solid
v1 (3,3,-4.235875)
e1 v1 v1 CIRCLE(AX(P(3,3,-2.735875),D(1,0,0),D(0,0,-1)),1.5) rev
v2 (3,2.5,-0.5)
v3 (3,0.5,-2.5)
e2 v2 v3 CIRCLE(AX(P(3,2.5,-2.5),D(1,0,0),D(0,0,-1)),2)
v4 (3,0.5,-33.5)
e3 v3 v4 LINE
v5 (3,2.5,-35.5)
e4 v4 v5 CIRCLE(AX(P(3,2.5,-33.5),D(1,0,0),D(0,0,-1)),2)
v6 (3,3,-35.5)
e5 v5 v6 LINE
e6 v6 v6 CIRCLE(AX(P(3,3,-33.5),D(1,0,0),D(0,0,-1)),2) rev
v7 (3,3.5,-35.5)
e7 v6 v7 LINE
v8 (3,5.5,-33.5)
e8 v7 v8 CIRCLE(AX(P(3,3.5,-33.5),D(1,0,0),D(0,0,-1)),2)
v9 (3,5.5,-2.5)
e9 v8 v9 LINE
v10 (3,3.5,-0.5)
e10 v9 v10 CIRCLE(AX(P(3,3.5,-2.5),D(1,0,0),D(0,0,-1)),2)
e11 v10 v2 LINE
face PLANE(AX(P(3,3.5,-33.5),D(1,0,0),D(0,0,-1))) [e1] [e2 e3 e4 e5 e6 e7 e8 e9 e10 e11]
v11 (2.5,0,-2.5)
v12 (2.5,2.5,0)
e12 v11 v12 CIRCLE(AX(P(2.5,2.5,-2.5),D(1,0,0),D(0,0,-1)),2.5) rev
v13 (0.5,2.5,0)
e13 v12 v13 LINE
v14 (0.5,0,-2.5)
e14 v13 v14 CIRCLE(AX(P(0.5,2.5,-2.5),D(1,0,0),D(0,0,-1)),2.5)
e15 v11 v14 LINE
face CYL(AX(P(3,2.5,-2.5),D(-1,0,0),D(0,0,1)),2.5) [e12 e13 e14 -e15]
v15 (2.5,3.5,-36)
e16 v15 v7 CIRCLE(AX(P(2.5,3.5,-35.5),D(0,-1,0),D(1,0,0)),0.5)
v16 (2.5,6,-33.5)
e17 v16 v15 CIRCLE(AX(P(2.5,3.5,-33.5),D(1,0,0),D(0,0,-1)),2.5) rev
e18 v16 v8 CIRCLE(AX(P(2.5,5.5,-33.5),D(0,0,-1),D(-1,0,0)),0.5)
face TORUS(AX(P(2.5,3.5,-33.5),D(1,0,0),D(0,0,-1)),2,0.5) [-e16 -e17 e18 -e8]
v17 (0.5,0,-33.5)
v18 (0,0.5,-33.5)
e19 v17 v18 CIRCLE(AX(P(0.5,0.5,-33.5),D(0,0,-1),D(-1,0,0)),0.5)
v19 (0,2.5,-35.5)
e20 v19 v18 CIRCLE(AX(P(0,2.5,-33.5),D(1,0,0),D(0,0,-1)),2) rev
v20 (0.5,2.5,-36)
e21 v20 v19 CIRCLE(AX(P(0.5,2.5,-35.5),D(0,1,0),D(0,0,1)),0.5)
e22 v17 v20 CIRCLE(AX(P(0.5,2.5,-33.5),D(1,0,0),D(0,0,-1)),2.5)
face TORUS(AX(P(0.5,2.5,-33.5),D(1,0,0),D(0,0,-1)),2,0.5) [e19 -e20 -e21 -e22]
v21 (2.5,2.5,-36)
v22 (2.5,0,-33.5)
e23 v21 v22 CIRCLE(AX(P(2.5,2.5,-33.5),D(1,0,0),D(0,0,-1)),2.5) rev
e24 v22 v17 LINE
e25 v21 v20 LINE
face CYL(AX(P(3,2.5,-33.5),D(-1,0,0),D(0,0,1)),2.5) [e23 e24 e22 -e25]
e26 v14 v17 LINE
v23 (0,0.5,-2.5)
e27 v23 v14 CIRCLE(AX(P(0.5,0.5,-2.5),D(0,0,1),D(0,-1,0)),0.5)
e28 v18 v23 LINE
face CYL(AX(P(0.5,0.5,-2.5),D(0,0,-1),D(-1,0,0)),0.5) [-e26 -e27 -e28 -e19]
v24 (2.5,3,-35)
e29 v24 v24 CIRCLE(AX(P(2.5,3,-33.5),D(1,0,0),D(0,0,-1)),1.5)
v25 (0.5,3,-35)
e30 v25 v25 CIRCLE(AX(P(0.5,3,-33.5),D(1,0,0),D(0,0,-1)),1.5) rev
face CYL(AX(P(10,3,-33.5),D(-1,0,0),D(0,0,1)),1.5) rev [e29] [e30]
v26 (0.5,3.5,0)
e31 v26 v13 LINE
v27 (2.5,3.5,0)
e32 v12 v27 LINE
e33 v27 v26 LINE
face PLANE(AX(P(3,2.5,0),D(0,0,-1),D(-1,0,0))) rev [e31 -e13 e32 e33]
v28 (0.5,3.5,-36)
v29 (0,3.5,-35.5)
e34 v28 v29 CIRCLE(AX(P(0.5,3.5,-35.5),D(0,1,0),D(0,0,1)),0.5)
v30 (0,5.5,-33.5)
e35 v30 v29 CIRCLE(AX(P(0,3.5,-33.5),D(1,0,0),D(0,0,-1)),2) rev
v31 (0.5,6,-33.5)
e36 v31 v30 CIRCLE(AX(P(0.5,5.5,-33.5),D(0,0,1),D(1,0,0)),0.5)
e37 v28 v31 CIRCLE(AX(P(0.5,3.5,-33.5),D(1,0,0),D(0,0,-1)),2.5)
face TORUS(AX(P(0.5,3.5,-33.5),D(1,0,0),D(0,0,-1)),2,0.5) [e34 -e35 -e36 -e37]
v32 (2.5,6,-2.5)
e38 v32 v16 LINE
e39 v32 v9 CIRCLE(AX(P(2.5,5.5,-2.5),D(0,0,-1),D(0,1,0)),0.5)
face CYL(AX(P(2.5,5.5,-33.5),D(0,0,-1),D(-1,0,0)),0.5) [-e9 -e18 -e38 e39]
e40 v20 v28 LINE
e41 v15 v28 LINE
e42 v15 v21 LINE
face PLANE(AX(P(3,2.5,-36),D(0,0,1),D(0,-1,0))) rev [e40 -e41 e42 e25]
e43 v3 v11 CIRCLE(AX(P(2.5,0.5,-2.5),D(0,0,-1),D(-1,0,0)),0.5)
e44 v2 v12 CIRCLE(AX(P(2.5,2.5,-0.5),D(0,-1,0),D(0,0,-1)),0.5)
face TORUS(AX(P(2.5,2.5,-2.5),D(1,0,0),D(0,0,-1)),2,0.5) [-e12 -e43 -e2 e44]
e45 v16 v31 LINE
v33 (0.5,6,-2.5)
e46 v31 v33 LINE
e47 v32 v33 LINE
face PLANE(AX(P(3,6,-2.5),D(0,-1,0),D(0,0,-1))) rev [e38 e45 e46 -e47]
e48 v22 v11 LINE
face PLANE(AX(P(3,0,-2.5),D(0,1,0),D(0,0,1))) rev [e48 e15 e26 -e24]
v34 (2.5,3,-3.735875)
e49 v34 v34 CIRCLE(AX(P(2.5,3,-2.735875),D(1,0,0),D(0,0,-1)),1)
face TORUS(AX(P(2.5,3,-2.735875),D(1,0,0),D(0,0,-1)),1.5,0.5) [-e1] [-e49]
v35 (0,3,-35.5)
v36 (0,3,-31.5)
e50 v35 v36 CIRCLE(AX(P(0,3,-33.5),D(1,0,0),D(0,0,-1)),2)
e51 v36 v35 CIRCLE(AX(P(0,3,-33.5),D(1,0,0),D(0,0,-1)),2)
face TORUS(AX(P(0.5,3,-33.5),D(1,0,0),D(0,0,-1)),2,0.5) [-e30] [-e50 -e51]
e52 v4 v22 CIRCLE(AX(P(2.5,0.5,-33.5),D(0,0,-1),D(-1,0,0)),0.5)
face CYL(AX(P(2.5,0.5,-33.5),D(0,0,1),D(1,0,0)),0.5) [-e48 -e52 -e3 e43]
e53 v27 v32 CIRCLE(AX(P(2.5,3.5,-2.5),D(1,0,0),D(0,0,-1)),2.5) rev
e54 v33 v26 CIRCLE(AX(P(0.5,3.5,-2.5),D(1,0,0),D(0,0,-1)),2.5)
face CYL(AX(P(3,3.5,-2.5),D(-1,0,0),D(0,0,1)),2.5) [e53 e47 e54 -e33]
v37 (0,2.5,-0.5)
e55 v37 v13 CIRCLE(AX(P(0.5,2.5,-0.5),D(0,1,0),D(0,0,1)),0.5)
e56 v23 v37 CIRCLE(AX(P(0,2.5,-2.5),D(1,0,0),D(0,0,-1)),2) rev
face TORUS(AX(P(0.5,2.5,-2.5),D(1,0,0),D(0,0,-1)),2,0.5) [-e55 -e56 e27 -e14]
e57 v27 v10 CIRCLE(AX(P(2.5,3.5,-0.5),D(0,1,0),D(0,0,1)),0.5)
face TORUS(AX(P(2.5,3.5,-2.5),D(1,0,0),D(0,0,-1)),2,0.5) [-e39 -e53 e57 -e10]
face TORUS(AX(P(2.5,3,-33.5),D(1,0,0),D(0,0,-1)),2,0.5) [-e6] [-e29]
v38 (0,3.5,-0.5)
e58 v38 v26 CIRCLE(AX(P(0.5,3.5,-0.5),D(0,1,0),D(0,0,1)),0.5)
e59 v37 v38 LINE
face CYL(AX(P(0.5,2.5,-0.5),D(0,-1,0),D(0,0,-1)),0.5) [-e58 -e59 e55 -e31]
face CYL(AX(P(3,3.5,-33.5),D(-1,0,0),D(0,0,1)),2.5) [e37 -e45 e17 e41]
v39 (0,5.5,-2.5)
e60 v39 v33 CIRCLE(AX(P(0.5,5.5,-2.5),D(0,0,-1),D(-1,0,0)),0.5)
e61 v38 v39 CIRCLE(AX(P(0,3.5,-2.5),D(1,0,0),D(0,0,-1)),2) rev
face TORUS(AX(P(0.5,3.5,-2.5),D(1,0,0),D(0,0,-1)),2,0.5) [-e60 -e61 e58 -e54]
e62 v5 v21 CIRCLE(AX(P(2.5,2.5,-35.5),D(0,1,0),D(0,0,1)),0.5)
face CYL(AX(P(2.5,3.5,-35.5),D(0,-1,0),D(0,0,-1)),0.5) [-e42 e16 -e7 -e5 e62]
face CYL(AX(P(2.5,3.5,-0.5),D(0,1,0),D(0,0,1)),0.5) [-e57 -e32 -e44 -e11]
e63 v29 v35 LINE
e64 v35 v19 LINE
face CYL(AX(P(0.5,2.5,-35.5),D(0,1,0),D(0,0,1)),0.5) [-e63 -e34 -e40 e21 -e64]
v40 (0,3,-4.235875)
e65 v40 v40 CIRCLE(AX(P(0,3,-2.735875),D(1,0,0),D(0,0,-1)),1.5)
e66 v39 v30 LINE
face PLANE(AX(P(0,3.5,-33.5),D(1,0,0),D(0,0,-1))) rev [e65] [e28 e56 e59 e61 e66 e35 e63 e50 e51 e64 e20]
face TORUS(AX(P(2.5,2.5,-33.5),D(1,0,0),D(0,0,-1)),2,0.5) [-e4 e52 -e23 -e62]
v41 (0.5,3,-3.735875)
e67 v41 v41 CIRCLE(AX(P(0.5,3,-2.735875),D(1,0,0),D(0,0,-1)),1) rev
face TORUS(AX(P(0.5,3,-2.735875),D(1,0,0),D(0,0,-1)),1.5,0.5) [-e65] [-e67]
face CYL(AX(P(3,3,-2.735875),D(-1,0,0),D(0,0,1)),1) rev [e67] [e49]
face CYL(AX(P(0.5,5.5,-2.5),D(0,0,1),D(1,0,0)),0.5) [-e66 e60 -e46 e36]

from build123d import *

# Parameters (mm, degrees)
SKETCH1_R           = 1
BOSS_EXTRUDE1_DEPTH = 3
SKETCH2_R           = 1.5
CUT_EXTRUDE1_DEPTH  = 10
FILLET1_R           = 0.5


with BuildPart() as part:
    # Sketch1 → Boss-Extrude1 (new body)
    with BuildSketch(Plane(origin=(0, 0, 0), x_dir=(0, 0, -1), z_dir=(1, 0, 0))):
        with BuildLine():
            Line((2.5, 0), (33.5, 0))
            ThreePointArc((33.5, 0), (35.267766953, 0.732233047), (36, 2.5))
            Line((36, 2.5), (36, 3.5))
            ThreePointArc((36, 3.5), (35.267766953, 5.267766953), (33.5, 6))
            Line((33.5, 6), (2.5, 6))
            ThreePointArc((2.5, 6), (0.732233047, 5.267766953), (0, 3.5))
            Line((0, 3.5), (0, 2.5))
            ThreePointArc((0, 2.5), (0.732233047, 0.732233047), (2.5, 0))
        make_face()
        with Locations((2.73587532, 3)):
            Circle(SKETCH1_R, mode=Mode.SUBTRACT)
    extrude(amount=BOSS_EXTRUDE1_DEPTH)

    # Sketch2 → Cut-Extrude1 (cut)
    with BuildSketch(Plane.ZY):
        with Locations((-33.5, 3)):
            Circle(SKETCH2_R)
    extrude(amount=-CUT_EXTRUDE1_DEPTH, mode=Mode.SUBTRACT)

    # Fillet1
    fillet1_edges = [part.edges().sort_by_distance(p)[0] for p in [
        (3, 5.267766953, -0.732233047),
        (0, 6, -18),
        (0, 5.267766953, -35.267766953),
        (3, 3, 0),
        (3, 0.732233047, -0.732233047),
        (3, 0, -18),
        (0, 3, -1.73587532),
        (3, 3, -1.73587532),
        (3, 0.732233047, -35.267766953),
        (3, 3, -36),
        (3, 3, -35),
        (0, 3, -35),
        (3, 5.267766953, -35.267766953),
        (3, 6, -18),
        (0, 3, -36),
        (0, 0.732233047, -35.267766953),
        (0, 0, -18),
        (0, 0.732233047, -0.732233047),
        (0, 3, 0),
        (0, 5.267766953, -0.732233047),
    ]]
    fillet(fillet1_edges, radius=FILLET1_R - 0.0001)  # a hair under: the kernel refuses the full size


solid = part.part
